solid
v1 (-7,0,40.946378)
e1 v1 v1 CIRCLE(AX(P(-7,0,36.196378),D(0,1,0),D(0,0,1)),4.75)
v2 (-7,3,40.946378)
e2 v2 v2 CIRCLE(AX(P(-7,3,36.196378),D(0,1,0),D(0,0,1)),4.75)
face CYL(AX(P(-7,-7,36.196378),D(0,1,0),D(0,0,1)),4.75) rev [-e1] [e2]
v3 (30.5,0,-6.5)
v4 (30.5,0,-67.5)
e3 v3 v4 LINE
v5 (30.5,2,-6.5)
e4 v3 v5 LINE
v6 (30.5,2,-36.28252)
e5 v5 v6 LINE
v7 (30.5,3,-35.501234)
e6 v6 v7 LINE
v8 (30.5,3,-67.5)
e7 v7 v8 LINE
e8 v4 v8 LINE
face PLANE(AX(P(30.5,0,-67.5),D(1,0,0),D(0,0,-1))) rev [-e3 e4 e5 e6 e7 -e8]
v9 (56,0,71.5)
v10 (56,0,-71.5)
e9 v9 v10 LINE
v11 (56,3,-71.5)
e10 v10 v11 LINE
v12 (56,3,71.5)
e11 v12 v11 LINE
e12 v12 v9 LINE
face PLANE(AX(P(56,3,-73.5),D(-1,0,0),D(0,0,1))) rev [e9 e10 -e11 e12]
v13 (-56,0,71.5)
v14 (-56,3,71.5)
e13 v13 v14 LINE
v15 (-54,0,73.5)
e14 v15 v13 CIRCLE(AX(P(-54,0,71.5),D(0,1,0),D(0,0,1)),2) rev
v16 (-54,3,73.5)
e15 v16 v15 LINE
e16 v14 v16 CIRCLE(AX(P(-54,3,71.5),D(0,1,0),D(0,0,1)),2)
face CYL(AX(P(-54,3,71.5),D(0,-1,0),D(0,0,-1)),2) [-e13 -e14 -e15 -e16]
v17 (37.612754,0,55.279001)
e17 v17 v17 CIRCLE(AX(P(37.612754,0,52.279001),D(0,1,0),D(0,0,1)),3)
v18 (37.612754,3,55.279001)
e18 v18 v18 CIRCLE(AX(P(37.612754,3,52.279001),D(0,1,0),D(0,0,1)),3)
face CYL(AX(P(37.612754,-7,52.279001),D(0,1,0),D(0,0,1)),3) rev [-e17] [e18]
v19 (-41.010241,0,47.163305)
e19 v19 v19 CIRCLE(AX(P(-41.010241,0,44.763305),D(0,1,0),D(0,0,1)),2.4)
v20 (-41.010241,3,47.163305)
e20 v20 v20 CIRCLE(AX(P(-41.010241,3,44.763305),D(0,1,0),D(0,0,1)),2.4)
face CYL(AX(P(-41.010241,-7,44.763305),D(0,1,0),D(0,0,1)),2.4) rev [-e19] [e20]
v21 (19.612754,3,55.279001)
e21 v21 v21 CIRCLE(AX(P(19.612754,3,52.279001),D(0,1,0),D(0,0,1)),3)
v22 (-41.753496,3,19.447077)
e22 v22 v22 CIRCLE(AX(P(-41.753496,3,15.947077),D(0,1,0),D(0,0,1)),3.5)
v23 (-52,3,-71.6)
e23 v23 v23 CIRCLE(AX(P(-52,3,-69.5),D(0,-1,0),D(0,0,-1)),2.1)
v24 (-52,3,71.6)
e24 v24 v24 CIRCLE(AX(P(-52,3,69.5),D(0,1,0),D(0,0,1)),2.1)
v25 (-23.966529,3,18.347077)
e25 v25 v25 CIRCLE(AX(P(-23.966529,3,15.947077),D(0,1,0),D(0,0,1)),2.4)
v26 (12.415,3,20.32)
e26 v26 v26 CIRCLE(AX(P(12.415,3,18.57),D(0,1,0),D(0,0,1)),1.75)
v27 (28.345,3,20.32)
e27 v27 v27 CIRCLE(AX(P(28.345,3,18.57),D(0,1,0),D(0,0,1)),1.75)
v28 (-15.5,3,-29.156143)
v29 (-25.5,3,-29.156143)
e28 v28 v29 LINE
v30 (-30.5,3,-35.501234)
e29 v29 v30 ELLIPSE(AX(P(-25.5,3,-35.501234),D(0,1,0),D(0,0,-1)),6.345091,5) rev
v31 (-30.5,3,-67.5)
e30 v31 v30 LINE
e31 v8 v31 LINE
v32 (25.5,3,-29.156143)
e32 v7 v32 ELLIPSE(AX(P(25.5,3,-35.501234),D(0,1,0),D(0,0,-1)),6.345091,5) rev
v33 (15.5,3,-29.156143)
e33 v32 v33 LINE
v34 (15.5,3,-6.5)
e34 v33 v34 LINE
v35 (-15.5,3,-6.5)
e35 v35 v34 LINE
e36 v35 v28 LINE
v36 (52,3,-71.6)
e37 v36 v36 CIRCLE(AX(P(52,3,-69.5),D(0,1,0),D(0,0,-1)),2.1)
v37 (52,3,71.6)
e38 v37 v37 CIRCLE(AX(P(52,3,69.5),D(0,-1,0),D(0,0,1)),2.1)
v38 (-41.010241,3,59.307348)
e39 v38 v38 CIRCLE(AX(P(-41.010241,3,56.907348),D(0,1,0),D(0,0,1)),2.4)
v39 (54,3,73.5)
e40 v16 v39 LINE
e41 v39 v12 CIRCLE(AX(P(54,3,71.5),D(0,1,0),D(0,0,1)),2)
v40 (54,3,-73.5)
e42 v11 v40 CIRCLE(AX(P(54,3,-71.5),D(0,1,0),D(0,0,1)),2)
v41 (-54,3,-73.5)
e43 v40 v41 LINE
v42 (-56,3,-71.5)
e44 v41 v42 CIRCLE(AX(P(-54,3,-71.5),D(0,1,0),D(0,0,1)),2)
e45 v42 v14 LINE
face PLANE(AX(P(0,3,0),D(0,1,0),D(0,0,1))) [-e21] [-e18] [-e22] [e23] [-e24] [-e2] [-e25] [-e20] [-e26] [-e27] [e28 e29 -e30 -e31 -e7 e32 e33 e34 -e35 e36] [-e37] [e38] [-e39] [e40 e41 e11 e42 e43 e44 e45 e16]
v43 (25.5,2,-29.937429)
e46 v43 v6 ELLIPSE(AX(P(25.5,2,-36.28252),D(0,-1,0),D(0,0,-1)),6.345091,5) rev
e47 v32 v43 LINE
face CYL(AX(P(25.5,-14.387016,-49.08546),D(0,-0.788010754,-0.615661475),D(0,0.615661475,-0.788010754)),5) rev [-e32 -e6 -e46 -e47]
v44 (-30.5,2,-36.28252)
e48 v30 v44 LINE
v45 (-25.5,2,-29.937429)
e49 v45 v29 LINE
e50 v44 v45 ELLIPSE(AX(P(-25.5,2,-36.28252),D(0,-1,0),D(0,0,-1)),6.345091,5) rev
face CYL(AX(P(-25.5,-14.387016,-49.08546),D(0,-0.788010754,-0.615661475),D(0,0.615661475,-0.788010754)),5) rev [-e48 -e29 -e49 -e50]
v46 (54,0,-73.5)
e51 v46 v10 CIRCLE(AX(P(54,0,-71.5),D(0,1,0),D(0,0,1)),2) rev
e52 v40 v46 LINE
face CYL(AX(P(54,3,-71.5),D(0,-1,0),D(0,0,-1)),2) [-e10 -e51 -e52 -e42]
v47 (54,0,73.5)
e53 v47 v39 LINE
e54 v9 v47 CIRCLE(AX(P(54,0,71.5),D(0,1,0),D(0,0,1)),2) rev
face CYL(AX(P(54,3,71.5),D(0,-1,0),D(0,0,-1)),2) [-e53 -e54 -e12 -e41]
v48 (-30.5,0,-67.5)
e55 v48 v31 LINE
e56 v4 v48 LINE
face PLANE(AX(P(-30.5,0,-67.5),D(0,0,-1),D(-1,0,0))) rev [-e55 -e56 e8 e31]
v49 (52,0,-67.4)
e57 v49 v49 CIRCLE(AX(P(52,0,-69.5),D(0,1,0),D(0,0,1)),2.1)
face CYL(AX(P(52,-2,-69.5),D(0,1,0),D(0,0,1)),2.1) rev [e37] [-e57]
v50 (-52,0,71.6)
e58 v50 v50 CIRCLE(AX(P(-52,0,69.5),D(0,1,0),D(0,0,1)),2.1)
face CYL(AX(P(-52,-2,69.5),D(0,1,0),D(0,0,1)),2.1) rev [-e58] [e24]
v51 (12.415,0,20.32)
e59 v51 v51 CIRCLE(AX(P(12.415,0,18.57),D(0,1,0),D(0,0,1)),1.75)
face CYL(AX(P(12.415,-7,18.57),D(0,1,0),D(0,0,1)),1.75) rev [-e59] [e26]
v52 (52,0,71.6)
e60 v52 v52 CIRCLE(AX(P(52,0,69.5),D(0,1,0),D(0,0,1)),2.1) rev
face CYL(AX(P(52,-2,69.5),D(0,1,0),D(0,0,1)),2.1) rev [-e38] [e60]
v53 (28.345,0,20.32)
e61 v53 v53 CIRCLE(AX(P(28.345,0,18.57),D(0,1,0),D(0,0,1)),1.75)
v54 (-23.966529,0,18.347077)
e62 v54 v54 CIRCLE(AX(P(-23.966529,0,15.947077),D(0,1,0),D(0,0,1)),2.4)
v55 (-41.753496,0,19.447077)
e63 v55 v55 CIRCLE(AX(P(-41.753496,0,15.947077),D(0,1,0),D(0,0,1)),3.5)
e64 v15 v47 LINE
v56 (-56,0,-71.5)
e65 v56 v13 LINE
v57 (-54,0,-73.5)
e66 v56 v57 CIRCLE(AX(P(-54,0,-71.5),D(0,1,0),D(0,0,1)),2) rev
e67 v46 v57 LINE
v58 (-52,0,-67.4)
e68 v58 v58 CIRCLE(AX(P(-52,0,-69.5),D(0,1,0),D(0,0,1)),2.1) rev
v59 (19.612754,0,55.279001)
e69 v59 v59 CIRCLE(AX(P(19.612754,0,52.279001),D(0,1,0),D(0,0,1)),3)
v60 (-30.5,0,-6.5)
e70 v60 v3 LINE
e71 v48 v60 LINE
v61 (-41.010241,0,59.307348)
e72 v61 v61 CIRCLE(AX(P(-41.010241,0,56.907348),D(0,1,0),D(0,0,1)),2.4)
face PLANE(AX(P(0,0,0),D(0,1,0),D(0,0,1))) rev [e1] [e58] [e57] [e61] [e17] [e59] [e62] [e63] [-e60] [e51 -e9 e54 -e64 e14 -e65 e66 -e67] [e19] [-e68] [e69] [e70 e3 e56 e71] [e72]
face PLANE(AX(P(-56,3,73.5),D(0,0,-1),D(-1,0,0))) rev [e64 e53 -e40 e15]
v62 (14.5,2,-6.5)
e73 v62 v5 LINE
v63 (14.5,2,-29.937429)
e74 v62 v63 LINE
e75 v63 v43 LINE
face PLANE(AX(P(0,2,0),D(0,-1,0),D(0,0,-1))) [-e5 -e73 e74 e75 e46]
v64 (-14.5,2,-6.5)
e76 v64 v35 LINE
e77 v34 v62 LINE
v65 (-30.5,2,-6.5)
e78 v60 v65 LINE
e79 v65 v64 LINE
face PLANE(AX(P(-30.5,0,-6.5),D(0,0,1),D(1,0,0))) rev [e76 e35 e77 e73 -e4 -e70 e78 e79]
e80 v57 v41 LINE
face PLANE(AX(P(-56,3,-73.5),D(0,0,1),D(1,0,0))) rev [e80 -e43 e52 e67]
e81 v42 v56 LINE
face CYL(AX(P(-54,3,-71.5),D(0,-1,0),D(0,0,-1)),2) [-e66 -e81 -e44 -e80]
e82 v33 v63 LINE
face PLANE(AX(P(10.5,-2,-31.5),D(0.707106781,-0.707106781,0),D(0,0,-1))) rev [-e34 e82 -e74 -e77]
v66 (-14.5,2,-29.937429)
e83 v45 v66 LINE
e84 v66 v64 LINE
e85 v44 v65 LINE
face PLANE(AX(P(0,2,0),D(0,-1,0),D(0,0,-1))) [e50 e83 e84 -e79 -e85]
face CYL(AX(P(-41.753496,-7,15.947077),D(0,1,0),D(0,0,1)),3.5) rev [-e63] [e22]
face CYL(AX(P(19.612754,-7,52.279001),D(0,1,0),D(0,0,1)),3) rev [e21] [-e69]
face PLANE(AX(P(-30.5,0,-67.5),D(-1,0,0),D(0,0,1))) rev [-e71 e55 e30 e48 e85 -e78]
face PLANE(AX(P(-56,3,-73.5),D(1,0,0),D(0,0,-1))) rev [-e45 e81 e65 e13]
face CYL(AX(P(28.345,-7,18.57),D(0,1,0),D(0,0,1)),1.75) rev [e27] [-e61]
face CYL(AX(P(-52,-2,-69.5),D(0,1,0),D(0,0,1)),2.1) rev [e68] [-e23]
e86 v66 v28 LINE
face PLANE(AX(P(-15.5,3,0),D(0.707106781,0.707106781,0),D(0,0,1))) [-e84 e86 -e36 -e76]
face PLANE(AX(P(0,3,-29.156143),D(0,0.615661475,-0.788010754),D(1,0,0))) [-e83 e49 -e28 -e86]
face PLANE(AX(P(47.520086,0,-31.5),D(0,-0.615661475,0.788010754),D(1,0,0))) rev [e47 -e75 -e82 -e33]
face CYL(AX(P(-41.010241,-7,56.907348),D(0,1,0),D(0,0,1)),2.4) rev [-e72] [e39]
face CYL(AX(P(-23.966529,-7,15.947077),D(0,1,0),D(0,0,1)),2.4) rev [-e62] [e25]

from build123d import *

# Parameters (mm, degrees)
SKETCH1_W               = 112
SKETCH1_H               = 147
BOSS_EXTRUDE1_DEPTH     = 3
SKETCH2_W               = 61
SKETCH2_H               = 61
BOSS_EXTRUDE2_DEPTH     = 3
SKETCH2_2_W             = 61
SKETCH2_2_H             = 61
CUT_EXTRUDE1_DEPTH      = 93.451338552
SKETCH3_R               = 1.75
SKETCH3_R_2             = 2.4
SKETCH3_R_3             = 4.75
SKETCH3_R_4             = 3
SKETCH3_R_5             = 3.5
CUT_EXTRUDE2_DEPTH      = 10
SKETCH4_R               = 2.1
CUT_EXTRUDE3_DEPTH      = 5
MIRROR2_COPY_1_SKETCH_R = 2.1
MIRROR2_COPY_1_DEPTH    = 5
FILLET1_R               = 2
SKETCH5_W               = 37.020085877
SKETCH5_H               = 31.91839976
BOSS_EXTRUDE4_DEPTH     = 1
CHAMFER4_SIZE           = 2.34385688
CHAMFER4_SIZE_2         = 3
MIRROR9_START           = 14.5
MIRROR9_DEPTH           = 16
MIRROR9_START_2         = 7
MIRROR9_2_DEPTH         = 1.838834765
FILLET2_R               = 5


with BuildPart() as part:
    # Sketch1 → Boss-Extrude1 (new body)
    with BuildSketch(Plane(origin=(0, 0, 0), x_dir=(1, 0, 0), z_dir=(0, 1, 0))):
        Rectangle(SKETCH1_W, SKETCH1_H)
    extrude(amount=BOSS_EXTRUDE1_DEPTH)

    # Sketch2 → Boss-Extrude2 (add)
    with BuildSketch(Plane(origin=(0, 3, 0), x_dir=(1, 0, 0), z_dir=(0, 1, 0))):
        with Locations((0, 37)):
            Rectangle(SKETCH2_W, SKETCH2_H)
    extrude(amount=-BOSS_EXTRUDE2_DEPTH)

    # Sketch2<2> → Cut-Extrude1 (cut, through all)
    with BuildSketch(Plane(origin=(0, 3, 0), x_dir=(1, 0, 0), z_dir=(0, 1, 0))):
        with Locations((0, 37)):
            Rectangle(SKETCH2_2_W, SKETCH2_2_H)
    extrude(amount=-CUT_EXTRUDE1_DEPTH, mode=Mode.SUBTRACT)

    # Sketch3 → Cut-Extrude2 (cut)
    with BuildSketch(Plane(origin=(0, 3, 0), x_dir=(1, 0, 0), z_dir=(0, 1, 0))):
        with Locations(Location((12.415, -18.57, 0), (0, 0, 270))):
            Circle(SKETCH3_R)
        with Locations(Location((28.345, -18.57, 0), (0, 0, 270))):
            Circle(SKETCH3_R)
        with Locations(Location((-41.010240817, -44.763305049, 0), (0, 0, 270))):
            Circle(SKETCH3_R_2)
        with Locations(Location((-41.010240817, -56.907347776, 0), (0, 0, 270))):
            Circle(SKETCH3_R_2)
        with Locations(Location((-23.966529419, -15.947077361, 0), (0, 0, 270))):
            Circle(SKETCH3_R_2)
        with Locations(Location((-7, -36.196378326, 0), (0, 0, 270))):
            Circle(SKETCH3_R_3)
        with Locations(Location((19.612753758, -52.279000863, 0), (0, 0, 270))):
            Circle(SKETCH3_R_4)
        with Locations(Location((37.612753758, -52.279000863, 0), (0, 0, 270))):
            Circle(SKETCH3_R_4)
        with Locations(Location((-41.753496243, -15.947077361, 0), (0, 0, 270))):
            Circle(SKETCH3_R_5)
    extrude(amount=-CUT_EXTRUDE2_DEPTH, mode=Mode.SUBTRACT)

    # Sketch4 → Cut-Extrude3 (cut)
    with BuildSketch(Plane(origin=(0, 3, 0), x_dir=(1, 0, 0), z_dir=(0, 1, 0))):
        with Locations(Location((-52, -69.5, 0), (0, 0, 270))):
            Circle(SKETCH4_R)
    cut_extrude3 = extrude(amount=-CUT_EXTRUDE3_DEPTH, mode=Mode.SUBTRACT)

    # Mirror1: Cut-Extrude3 across plane
    add(cut_extrude3.mirror(Plane(origin=(0, 0, 0), x_dir=(0, 0, 1), z_dir=(1, 0, 0))), mode=Mode.SUBTRACT)

    # Mirror2: Cut-Extrude3 across plane
    add(cut_extrude3.mirror(Plane.XY), mode=Mode.SUBTRACT)

    # Mirror2 copy 1 sketch → Mirror2 copy 1 (cut)
    with BuildSketch(Plane(origin=(0, 3, 0), x_dir=(-1, 0, 0), z_dir=(0, 1, 0))):
        with Locations(Location((-52, -69.5, 0), (0, 0, 270))):
            Circle(MIRROR2_COPY_1_SKETCH_R)
    extrude(amount=-MIRROR2_COPY_1_DEPTH, mode=Mode.SUBTRACT)

    # Fillet1
    fillet1_edges = [part.edges().sort_by_distance(p)[0] for p in [
        (56, 1.5, 73.5),
        (-56, 1.5, 73.5),
        (-56, 1.5, -73.5),
        (56, 1.5, -73.5),
    ]]
    fillet(fillet1_edges, radius=FILLET1_R)

    # Sketch5 → Boss-Extrude4 (add)
    with BuildSketch(Plane(origin=(0, 2, 0), x_dir=(1, 0, 0), z_dir=(0, 1, 0))):
        with Locations((-29.010042938, 15.54080012)):
            Rectangle(SKETCH5_W, SKETCH5_H)
    extrude(amount=BOSS_EXTRUDE4_DEPTH)

    # Chamfer1
    # the kernel refuses this chamfer: 5 mm, written as the material it takes off along each edge
    with BuildSketch(Plane(origin=(-10.5, 3, -44.35841494), x_dir=(-1, 0, 0), z_dir=(0, 0, 1))) as chamfer1_piece_1:
        with BuildLine():
            Line((5.141421356, -0.141421356), (-0.141421356, 5.141421356))
            Line((-0.141421356, 5.141421356), (-0.241421356, 5.141421356))
            ThreePointArc((-0.241421356, 5.141421356), (-0.1, 2.570710678), (-0.1, 0))
            Line((-0.1, 0), (0, -0.1))
            ThreePointArc((0, -0.1), (2.570710678, -0.1), (5.141421356, -0.241421356))
            Line((5.141421356, -0.241421356), (5.141421356, -0.141421356))
        make_face()
    extrude(amount=37.85841494, mode=Mode.SUBTRACT)

    # Chamfer4
    # the kernel refuses this chamfer: 3, 2.34385688 mm, written as the material it takes off along each edge
    with BuildSketch(Plane(origin=(-30.5, 3, -31.5), x_dir=(0, 0, 1), z_dir=(1, 0, 0))) as chamfer4_piece_1:
        Polygon((CHAMFER4_SIZE, 0), (0, CHAMFER4_SIZE_2), (0, 0), align=None)
    extrude(amount=22.738607652, mode=Mode.SUBTRACT)

    # Mirror9: read off the stored shape, not the designer's step
    # Mirror9 outline → Mirror9 (add)
    with BuildSketch(Plane.YZ.offset(MIRROR9_START)):
        Polygon((2, -29.937428747), (3, -29.15614312), (3, -6.5), (2, -6.5), align=None)
    extrude(amount=MIRROR9_DEPTH)

    # Mirror9 2 outline → Mirror9 2 (cut)
    with BuildSketch(Plane(origin=(0, 0, 0), x_dir=(0.7071067811865509, 0.707106781186544, 0), z_dir=(0.707106781186544, -0.707106781186551, 0)).offset(MIRROR9_START_2)):
        Polygon((13.081475452, -29.15614312), (13.081475452, -6.5), (11.66726189, -6.5), (11.66726189, -29.937428747), align=None)
    extrude(amount=MIRROR9_2_DEPTH, mode=Mode.SUBTRACT)

    # Fillet2
    # the kernel refuses this fillet: 5 mm, written as the material it adds along each edge
    with BuildSketch(Plane(origin=(-30.5, 12.850134419, -21.460374677), x_dir=(1, 0, 0), z_dir=(0, -0.788010753545573, -0.6156614754039254))) as fillet2_piece_1_section:
        with BuildLine():
            CenterArc((FILLET2_R, -FILLET2_R), FILLET2_R, 90, 90)
            Line((0, -FILLET2_R), (0, 0))
            Line((0, 0), (FILLET2_R, 0))
        make_face()
    fillet2_piece_1 = extrude(amount=26.269018215, mode=Mode.PRIVATE)
    fillet2_piece_1 = split(fillet2_piece_1, bisect_by=Plane(origin=(-30.5, 3, -21.460374677), z_dir=(0, -1, 0)), keep=Keep.TOP, mode=Mode.PRIVATE)
    fillet2_piece_1 = split(fillet2_piece_1, bisect_by=Plane(origin=(-30.5, 2, -21.460374677), z_dir=(0, 1, 0)), keep=Keep.TOP, mode=Mode.PRIVATE)
    add(fillet2_piece_1)
    with BuildSketch(Plane(origin=(30.5, -7.850134418, -37.633197192), x_dir=(0, 0.6156614755670328, -0.7880107534181395), z_dir=(0, 0.7880107534181395, 0.6156614755670328))) as fillet2_piece_2_section:
        with BuildLine():
            CenterArc((FILLET2_R, FILLET2_R), FILLET2_R, 180, 90)
            Line((0, FILLET2_R), (0, 0))
            Line((0, 0), (FILLET2_R, 0))
        make_face()
    fillet2_piece_2 = extrude(amount=26.269018215, mode=Mode.PRIVATE)
    fillet2_piece_2 = split(fillet2_piece_2, bisect_by=Plane(origin=(30.5, 3, -37.633197192), z_dir=(0, -1, 0)), keep=Keep.TOP, mode=Mode.PRIVATE)
    fillet2_piece_2 = split(fillet2_piece_2, bisect_by=Plane(origin=(30.5, 2, -37.633197192), z_dir=(0, 1, 0)), keep=Keep.TOP, mode=Mode.PRIVATE)
    add(fillet2_piece_2)


solid = part.part
